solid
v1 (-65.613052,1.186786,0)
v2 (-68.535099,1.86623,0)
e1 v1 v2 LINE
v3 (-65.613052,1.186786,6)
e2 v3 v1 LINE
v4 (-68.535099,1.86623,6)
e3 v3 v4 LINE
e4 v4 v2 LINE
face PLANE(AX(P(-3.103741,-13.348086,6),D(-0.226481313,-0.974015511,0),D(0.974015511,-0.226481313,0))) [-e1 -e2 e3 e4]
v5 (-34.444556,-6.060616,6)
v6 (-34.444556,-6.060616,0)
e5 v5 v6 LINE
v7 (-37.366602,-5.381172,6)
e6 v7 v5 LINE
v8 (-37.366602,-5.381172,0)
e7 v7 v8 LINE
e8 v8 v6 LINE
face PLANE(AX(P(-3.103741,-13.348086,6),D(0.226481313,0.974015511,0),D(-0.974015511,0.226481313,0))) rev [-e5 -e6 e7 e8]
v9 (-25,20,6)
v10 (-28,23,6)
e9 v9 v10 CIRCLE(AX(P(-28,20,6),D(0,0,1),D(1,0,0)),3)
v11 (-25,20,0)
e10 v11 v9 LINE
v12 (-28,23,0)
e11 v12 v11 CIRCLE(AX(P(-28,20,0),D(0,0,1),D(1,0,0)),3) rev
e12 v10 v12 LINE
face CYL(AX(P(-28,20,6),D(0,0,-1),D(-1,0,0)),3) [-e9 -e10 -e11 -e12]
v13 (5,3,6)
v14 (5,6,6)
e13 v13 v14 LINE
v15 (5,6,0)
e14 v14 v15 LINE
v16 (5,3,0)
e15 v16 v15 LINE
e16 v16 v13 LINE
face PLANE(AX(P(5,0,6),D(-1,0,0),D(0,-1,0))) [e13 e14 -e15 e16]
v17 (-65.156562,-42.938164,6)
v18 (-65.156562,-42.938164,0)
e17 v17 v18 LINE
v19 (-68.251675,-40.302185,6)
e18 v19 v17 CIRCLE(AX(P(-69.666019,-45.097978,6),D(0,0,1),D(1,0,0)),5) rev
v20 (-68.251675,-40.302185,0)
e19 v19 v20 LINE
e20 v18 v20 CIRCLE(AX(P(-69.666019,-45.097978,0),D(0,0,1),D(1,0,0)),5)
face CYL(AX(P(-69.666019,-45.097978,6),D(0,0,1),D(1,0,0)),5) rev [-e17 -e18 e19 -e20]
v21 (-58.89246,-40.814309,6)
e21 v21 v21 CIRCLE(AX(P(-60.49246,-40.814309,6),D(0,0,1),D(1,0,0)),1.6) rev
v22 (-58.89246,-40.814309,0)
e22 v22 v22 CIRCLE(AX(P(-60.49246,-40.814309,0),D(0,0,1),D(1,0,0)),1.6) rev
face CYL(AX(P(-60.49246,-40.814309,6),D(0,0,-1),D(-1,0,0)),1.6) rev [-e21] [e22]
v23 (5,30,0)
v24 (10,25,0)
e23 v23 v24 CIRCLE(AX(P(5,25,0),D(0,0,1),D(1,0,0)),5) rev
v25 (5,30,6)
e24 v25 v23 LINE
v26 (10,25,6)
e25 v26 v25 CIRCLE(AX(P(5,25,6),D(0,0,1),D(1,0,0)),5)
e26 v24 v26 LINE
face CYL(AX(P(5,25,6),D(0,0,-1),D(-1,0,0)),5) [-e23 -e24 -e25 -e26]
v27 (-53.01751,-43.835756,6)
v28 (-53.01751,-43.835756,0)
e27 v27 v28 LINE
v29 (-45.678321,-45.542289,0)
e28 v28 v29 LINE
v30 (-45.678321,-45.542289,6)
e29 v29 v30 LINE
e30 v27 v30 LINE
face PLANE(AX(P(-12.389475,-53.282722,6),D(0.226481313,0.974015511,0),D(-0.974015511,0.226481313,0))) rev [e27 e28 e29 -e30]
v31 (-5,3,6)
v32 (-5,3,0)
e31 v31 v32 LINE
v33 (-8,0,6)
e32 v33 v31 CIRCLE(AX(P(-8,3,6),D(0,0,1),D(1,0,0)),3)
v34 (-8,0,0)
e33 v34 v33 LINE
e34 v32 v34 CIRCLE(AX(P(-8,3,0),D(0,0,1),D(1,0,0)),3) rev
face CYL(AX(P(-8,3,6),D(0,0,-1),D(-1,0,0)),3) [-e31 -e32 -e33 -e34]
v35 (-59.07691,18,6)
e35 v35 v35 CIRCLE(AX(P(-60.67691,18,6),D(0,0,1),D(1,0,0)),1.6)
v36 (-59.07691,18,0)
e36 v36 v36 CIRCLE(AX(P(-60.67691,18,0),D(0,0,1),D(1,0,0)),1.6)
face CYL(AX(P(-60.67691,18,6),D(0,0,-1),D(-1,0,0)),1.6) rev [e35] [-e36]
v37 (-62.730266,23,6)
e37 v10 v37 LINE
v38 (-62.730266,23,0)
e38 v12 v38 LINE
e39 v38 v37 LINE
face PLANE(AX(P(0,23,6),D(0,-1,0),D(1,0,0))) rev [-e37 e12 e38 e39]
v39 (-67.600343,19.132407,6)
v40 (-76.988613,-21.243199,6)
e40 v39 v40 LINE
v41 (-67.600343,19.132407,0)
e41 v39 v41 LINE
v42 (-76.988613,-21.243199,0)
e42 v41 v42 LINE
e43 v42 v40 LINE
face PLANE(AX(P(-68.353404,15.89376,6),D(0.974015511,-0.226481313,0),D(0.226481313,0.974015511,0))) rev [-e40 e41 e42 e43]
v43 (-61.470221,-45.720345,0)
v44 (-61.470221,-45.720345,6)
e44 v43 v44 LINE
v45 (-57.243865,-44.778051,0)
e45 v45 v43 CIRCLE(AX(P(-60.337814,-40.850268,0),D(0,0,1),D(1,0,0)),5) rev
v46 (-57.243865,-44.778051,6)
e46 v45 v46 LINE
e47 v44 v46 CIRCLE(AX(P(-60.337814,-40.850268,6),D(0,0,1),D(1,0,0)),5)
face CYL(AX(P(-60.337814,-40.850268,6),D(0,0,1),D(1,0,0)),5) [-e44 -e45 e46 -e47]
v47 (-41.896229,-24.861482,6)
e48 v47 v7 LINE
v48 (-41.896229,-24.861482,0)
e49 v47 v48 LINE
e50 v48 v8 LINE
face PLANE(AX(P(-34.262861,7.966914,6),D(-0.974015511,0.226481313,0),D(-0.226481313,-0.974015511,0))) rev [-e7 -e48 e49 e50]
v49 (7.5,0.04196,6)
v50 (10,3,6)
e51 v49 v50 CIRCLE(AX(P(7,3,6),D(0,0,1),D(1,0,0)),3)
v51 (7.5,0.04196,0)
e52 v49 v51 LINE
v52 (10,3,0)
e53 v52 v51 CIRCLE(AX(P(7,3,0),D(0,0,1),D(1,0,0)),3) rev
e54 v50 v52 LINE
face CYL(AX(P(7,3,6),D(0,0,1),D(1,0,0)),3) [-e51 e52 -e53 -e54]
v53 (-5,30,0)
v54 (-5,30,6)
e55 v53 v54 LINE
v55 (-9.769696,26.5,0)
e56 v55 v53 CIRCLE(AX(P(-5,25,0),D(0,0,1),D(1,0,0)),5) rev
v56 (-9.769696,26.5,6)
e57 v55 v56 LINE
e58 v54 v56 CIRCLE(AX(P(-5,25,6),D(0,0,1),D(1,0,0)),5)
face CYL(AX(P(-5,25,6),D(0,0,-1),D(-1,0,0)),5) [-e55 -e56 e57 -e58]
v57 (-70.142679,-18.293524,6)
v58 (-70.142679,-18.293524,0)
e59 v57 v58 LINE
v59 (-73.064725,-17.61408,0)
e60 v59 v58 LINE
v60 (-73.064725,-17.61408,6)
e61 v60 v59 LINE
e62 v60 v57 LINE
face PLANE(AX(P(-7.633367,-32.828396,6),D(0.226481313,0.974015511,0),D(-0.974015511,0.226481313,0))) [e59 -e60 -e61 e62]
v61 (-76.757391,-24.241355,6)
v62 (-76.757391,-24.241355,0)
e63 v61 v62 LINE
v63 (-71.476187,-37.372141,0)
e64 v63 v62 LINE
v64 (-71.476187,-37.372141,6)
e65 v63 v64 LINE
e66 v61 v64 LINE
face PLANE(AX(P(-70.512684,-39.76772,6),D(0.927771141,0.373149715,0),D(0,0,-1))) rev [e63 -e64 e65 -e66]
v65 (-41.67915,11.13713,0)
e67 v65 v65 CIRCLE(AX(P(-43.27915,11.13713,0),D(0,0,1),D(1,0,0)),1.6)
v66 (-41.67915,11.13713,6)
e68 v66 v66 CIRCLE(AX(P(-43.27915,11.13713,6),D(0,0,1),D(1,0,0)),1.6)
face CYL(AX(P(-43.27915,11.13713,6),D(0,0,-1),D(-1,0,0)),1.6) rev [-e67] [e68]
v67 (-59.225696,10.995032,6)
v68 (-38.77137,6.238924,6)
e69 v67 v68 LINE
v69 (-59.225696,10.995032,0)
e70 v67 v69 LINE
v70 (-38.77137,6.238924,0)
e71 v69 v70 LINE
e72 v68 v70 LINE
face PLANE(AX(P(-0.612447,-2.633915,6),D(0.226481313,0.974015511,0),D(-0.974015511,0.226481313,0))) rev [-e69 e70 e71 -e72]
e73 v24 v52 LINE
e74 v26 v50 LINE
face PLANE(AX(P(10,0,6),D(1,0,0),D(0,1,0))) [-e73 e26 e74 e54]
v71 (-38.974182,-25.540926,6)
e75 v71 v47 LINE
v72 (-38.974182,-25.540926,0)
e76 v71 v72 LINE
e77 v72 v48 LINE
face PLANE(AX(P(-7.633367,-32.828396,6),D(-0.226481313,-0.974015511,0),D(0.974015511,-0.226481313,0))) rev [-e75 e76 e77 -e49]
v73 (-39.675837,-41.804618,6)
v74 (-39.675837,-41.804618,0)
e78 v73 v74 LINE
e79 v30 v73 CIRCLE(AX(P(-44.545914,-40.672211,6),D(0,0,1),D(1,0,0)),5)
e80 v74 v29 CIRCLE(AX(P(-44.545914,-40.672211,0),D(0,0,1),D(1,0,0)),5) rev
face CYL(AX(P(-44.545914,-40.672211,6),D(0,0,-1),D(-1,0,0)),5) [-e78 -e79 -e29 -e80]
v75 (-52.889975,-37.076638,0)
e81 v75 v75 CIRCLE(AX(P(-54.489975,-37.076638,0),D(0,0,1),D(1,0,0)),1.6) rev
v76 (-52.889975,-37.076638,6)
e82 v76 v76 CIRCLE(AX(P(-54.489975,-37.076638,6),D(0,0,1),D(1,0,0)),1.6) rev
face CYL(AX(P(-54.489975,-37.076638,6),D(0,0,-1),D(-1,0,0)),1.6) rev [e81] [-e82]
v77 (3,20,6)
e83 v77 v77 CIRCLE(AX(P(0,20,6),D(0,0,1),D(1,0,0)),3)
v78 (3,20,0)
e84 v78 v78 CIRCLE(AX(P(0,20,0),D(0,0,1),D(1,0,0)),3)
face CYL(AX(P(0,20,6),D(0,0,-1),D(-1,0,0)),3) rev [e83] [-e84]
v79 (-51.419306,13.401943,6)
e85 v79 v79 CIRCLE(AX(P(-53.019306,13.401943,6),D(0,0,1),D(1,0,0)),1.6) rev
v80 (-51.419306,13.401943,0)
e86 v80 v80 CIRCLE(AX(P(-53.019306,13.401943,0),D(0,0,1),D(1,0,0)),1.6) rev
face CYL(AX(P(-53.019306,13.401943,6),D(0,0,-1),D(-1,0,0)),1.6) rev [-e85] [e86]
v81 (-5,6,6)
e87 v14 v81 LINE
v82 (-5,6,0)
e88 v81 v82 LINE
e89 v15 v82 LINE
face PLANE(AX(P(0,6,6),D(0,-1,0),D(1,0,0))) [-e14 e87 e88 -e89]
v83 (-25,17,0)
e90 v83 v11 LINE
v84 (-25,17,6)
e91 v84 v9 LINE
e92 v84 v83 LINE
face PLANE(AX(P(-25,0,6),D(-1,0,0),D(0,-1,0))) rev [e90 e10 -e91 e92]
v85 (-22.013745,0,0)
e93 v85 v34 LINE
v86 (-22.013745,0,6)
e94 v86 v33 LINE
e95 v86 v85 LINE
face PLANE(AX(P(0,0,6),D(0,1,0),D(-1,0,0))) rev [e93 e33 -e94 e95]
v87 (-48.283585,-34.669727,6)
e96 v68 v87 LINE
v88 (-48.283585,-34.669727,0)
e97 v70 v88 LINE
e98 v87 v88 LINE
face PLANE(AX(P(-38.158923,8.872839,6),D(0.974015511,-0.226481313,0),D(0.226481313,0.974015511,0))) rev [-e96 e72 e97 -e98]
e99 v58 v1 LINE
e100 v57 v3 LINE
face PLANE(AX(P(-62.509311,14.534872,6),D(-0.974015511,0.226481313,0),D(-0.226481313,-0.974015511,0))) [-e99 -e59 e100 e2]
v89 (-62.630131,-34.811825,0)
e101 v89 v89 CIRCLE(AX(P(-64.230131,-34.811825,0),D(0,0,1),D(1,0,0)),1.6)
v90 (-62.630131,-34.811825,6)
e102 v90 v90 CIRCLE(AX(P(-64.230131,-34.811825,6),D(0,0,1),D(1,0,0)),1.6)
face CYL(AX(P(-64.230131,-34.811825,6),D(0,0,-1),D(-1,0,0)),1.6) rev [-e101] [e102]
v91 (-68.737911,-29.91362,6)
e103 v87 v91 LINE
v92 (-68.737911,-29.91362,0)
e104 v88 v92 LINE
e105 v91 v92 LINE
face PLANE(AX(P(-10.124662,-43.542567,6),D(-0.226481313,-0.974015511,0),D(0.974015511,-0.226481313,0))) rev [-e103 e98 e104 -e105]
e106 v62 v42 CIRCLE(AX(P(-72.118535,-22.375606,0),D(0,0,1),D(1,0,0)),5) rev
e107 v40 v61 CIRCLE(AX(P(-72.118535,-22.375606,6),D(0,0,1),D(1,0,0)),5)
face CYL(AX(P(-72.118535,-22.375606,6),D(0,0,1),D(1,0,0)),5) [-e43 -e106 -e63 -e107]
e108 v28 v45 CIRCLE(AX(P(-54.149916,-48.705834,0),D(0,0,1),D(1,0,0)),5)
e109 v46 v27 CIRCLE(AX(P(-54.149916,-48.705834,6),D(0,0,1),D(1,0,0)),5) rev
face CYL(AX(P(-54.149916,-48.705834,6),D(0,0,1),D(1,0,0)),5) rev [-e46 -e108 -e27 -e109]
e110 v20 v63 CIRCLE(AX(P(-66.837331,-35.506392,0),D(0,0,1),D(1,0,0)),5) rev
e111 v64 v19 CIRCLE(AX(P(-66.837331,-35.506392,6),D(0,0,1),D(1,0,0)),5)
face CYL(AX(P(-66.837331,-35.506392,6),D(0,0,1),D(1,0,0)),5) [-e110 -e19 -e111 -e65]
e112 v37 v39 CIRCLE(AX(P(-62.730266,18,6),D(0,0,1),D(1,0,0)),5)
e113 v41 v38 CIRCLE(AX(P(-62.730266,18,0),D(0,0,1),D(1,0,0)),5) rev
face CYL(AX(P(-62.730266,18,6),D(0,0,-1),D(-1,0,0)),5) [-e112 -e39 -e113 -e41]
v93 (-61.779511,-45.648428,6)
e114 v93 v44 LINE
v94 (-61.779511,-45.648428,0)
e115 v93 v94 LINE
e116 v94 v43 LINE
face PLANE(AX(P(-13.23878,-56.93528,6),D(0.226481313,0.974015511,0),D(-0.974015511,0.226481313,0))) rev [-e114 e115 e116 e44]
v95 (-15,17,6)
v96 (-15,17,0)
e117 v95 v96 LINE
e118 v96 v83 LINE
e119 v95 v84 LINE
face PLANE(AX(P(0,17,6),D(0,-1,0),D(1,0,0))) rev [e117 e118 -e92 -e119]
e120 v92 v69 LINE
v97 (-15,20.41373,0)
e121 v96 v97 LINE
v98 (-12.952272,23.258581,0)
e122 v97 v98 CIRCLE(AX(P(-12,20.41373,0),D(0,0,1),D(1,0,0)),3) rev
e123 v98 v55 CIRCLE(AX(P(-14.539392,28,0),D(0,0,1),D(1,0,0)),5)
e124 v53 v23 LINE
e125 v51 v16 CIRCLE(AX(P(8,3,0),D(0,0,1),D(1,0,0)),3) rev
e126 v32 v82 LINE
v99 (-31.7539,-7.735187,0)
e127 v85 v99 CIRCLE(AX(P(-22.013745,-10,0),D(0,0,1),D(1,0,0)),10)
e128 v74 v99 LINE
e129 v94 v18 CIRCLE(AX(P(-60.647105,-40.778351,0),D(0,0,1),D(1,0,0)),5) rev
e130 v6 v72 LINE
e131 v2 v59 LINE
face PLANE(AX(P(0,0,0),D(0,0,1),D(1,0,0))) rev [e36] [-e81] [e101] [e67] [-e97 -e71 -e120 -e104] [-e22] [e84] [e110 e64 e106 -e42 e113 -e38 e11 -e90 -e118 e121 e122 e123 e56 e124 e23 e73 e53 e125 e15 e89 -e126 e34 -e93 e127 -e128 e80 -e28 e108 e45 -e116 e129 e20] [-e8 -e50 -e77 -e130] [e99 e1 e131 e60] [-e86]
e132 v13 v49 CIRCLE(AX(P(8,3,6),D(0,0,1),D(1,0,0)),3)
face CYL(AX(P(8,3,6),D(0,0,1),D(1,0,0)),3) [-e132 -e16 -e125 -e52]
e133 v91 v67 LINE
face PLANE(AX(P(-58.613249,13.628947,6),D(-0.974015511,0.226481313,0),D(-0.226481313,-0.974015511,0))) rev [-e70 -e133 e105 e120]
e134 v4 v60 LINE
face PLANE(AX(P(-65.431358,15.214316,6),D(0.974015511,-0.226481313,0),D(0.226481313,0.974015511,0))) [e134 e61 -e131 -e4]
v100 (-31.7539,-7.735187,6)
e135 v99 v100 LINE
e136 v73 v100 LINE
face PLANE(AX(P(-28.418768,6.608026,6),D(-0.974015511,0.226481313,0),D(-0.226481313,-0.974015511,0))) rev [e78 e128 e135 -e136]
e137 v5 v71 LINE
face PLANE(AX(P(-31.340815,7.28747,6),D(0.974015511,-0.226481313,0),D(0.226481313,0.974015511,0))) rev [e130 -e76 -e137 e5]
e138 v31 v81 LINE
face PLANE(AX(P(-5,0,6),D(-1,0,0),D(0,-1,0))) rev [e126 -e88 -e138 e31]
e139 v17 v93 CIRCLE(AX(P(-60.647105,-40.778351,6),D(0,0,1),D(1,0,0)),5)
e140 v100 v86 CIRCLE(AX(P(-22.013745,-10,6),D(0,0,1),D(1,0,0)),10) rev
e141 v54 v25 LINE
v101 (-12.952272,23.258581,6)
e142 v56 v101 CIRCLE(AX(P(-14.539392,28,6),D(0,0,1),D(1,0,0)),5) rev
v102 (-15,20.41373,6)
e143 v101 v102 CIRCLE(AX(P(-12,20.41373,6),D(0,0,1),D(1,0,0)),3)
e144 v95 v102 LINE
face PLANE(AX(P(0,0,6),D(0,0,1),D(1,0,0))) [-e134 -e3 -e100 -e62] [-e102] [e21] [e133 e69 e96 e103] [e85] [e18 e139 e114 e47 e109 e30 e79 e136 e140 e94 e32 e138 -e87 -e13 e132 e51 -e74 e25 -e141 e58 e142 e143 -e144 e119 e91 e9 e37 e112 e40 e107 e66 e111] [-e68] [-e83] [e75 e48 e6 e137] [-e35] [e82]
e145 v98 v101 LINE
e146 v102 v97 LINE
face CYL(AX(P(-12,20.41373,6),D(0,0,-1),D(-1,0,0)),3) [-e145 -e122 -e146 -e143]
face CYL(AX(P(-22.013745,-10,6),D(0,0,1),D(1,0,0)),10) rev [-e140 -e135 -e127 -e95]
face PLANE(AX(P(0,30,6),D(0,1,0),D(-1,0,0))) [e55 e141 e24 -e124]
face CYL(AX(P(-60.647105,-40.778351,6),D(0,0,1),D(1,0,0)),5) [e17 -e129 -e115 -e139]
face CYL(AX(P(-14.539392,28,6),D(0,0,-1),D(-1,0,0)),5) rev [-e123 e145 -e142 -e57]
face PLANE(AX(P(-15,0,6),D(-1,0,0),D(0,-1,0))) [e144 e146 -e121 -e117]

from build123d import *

# Parameters (mm, degrees)
ESBO_O1_R                = 1.599999999999999
ESBO_O1_R_2              = 1.600000000000006
ESBO_O1_R_3              = 1.5999999999999974
ESBO_O1_R_4              = 1.5999999999999985
ESBO_O1_R_5              = 1.5999999999999979
ESBO_O1_R_6              = 1.600000000000005
ESBO_O1_R_7              = 3.0000000000000013
RESSALTO_EXTRUS_O1_DEPTH = 6
FILETE1_R                = 10
FILETE2_R                = 5
FILETE4_R                = 5
FILETE5_R                = 3
CHANFRO1_SIZE            = 15
CHANFRO1_SIZE2           = 10.50311307314568
FILETE6_R                = 5


# Some blends are built 0.0001 mm under size
with BuildPart() as part:
    # Esboço1 → Ressalto-extrusão1 (new body)
    with BuildSketch(Plane.XY):
        Polygon((10.000000000000002, -2e-17), (9.999999999999998, 30.00000000000003), (-10.000000000000002, 30.000000000000025), (-10.000000000000002, 23.000000000000007), (-15.00000000000002, 22.99999999999999), (-15, 16.999999999999996), (-25, 17), (-25.000000000000007, 22.999999999999993), (-66.7010377283415, 23.00000000000001), (-80.7428791412217, -37.388961654722294), (-65.64563872754113, -40.899422007942356), (-66.49494365170727, -44.55198017254248), (-56.754788546106894, -46.81679330365219), (-55.90548362194075, -43.16423513905207), (-40.8082432082602, -46.674695492272136), (-29.95528839436153, 0), (-5.0000000000000036, -3e-17), (-5.000000000000001, 5.999999999999998), (4.999999999999999, 6), (5, -9.54e-15), align=None)
        with Locations((-60.49245953335221, -40.814309185297155)):
            Circle(ESBO_O1_R, mode=Mode.SUBTRACT)
        with Locations((-64.23013052059758, -34.81182506694214)):
            Circle(ESBO_O1_R_2, mode=Mode.SUBTRACT)
        with Locations((-54.48997541499719, -37.07663819805185)):
            Circle(ESBO_O1_R_3, mode=Mode.SUBTRACT)
        Polygon((-70.14267850253108, -18.293523811627352), (-73.06472503421121, -17.614079872294436), (-68.53509877199178, 1.8662303389063057), (-65.61305224031166, 1.1867863995733938), align=None, mode=Mode.SUBTRACT)
        Polygon((-48.28358518275084, -34.66972725556205), (-68.73791090451164, -29.91361968023165), (-59.22569575385083, 10.995031763289926), (-38.771370032090054, 6.238924187959523), align=None, mode=Mode.SUBTRACT)
        Polygon((-34.44455590239049, -6.060615619977673), (-38.97418216460991, -25.540925831178406), (-41.89622869629001, -24.861481891845497), (-37.3666024340706, -5.3811716806447585), align=None, mode=Mode.SUBTRACT)
        with Locations((-60.67691042150691, 18.000000000000004)):
            Circle(ESBO_O1_R_4, mode=Mode.SUBTRACT)
        with Locations((-53.019305521604494, 13.40194270577972)):
            Circle(ESBO_O1_R_5, mode=Mode.SUBTRACT)
        with Locations((-43.2791504160041, 11.137129574670004)):
            Circle(ESBO_O1_R_6, mode=Mode.SUBTRACT)
        with Locations((-2.44e-15, 20)):
            Circle(ESBO_O1_R_7, mode=Mode.SUBTRACT)
    extrude(amount=RESSALTO_EXTRUS_O1_DEPTH)

    # Filete1
    filete1_edges = [part.edges().sort_by_distance(p)[0] for p in [
        (-29.95528839436153, -3e-17, 3),
    ]]
    fillet(filete1_edges, radius=FILETE1_R)

    # Filete2
    # the kernel refuses this fillet: 5 mm, written as the material it takes off along each edge
    with BuildSketch(Plane(origin=(-66.70103772834149, 23.00000000000001, -9.926929788370014), x_dir=(-0.22648131311097233, -0.974015510560037, 0), z_dir=(0, 0, 1))) as filete2_piece_1:
        with BuildLine():
            CenterArc((FILETE2_R * 0.79415438307, FILETE2_R), FILETE2_R, 193.08999999999958, 76.91000000000048)
            Line((-FILETE2_R * 0.17986112749, FILETE2_R * 0.773518686889), (-FILETE2_R * 0.199341437702, FILETE2_R * 0.768989060627))
            Line((-FILETE2_R * 0.199341437702, FILETE2_R * 0.768989060627), (-FILETE2_R * 0.0158830876614, -FILETE2_R * 0.02))
            Line((-FILETE2_R * 0.0158830876614, -FILETE2_R * 0.02), (FILETE2_R * 0.79415438307, -FILETE2_R * 0.02))
            Line((FILETE2_R * 0.79415438307, -FILETE2_R * 0.02), (FILETE2_R * 0.79415438307, 6e-17))
        make_face()
    extrude(amount=25.853859576740028, mode=Mode.SUBTRACT)
    with BuildSketch(Plane(origin=(-66.49494365170727, -44.55198017254248, -12.103072956898195), x_dir=(0.9740155105600374, -0.22648131311097125, 0), z_dir=(0, 0, 1))) as filete2_piece_2:
        with BuildLine():
            CenterArc((4.841229182759275, 5.000000000000003), FILETE2_R, 194.4775121859302, 75.52248781406985)
            Line((1.133e-14, 3.7499999999999782), (-0.09682458365516827, 3.7249999999999814))
            ThreePointArc((-0.09682458365516827, 3.7249999999999814), (-0.10000000000000146, 1.874999999999995), (-0.10000000000000632, 2.39e-15))
            Line((-0.10000000000000632, 2.39e-15), (-4e-15, -0.0999999999999994))
            Line((-4e-15, -0.0999999999999994), (4.841229182759282, -0.09999999999999787))
            Line((4.841229182759282, -0.09999999999999787), (4.841229182759279, -9e-17))
        make_face()
    extrude(amount=30.20614591379639, mode=Mode.SUBTRACT)
    with BuildSketch(Plane(origin=(-56.754788546106894, -46.81679330365219, -12.103072956898142), x_dir=(0.22648131311097194, 0.9740155105600371, 0), z_dir=(0, 0, 1))) as filete2_piece_3:
        with BuildLine():
            CenterArc((4.9999999999999964, 4.841229182759264), FILETE2_R, 180.00000000000009, 75.52248781406979)
            Line((-5.64e-15, 4.841229182759256), (-0.10000000000000338, 4.841229182759253))
            Line((-0.10000000000000338, 4.841229182759253), (-0.09999999999999777, -2.99e-15))
            Line((-0.09999999999999777, -2.99e-15), (2.99e-15, -0.09999999999999777))
            ThreePointArc((2.99e-15, -0.09999999999999777), (1.8749999999999951, -0.10000000000000121), (3.724999999999985, -0.09682458365518365))
            Line((3.724999999999985, -0.09682458365518365), (3.7499999999999827, 3e-17))
        make_face()
    extrude(amount=30.206145913796284, mode=Mode.SUBTRACT)
    with BuildSketch(Plane(origin=(-40.8082432082602, -46.674695492272136, -12.500000000000021), x_dir=(0.22648131311097006, 0.9740155105600377, 0), z_dir=(0, 0, 1))) as filete2_piece_4:
        with BuildLine():
            CenterArc((FILETE2_R, FILETE2_R), FILETE2_R, 179.9999999999999, 90)
            Line((2.239e-14, FILETE2_R), (-FILETE2_R * 0.02, FILETE2_R))
            Line((-FILETE2_R * 0.02, FILETE2_R), (-FILETE2_R * 0.02, -FILETE2_R * 0.02))
            Line((-FILETE2_R * 0.02, -FILETE2_R * 0.02), (FILETE2_R, -FILETE2_R * 0.02))
            Line((FILETE2_R, -FILETE2_R * 0.02), (FILETE2_R, 6e-17))
        make_face()
    extrude(amount=31.000000000000043, mode=Mode.SUBTRACT)
    with BuildSketch(Plane(origin=(-10.000000000000002, 30.000000000000025, -12.499999999999996), x_dir=(1, 0, 0), z_dir=(0, 0, 1))) as filete2_piece_5:
        with BuildLine():
            CenterArc((FILETE2_R, -FILETE2_R), FILETE2_R, 90.00000000000001, 89.99999999999996)
            Line((-1.78e-15, -FILETE2_R), (-FILETE2_R * 0.02, -FILETE2_R))
            Line((-FILETE2_R * 0.02, -FILETE2_R), (-FILETE2_R * 0.02, FILETE2_R * 0.02))
            Line((-FILETE2_R * 0.02, FILETE2_R * 0.02), (FILETE2_R, FILETE2_R * 0.02))
            Line((FILETE2_R, FILETE2_R * 0.02), (FILETE2_R, 0))
        make_face()
    extrude(amount=30.999999999999993, mode=Mode.SUBTRACT)
    with BuildSketch(Plane(origin=(9.999999999999998, 30.00000000000003, -12.5), x_dir=(0, -1, 0), z_dir=(0, 0, 1))) as filete2_piece_6:
        with BuildLine():
            CenterArc((FILETE2_R, -FILETE2_R), FILETE2_R, 90, 90)
            Line((0, -FILETE2_R), (-FILETE2_R * 0.02, -FILETE2_R))
            Line((-FILETE2_R * 0.02, -FILETE2_R), (-FILETE2_R * 0.02, FILETE2_R * 0.02))
            Line((-FILETE2_R * 0.02, FILETE2_R * 0.02), (FILETE2_R, FILETE2_R * 0.02))
            Line((FILETE2_R, FILETE2_R * 0.02), (FILETE2_R, 0))
        make_face()
    extrude(amount=31, mode=Mode.SUBTRACT)

    # Filete4
    filete4_edges = [part.edges().sort_by_distance(p)[0] for p in [
        (-65.64563872754113, -40.89942200794236, 3),
        (-55.90548362194075, -43.16423513905207, 3),
        (-10.000000000000002, 23, 3),
    ]]
    fillet(filete4_edges, radius=FILETE4_R - 0.0001)  # a hair under: the kernel refuses the full size

    # Filete5
    # the kernel refuses this fillet: 3 mm, written as the material it takes off along each edge
    with BuildSketch(Plane(origin=(-25.000000000000007, 23.000000000000007, -7.499999999999991), x_dir=(-1, 0, 0), z_dir=(0, 0, 1))) as filete5_piece_1:
        with BuildLine():
            CenterArc((FILETE5_R, FILETE5_R), FILETE5_R, 180.00000000000006, 89.99999999999994)
            Line((-3.55e-15, FILETE5_R), (0, 0))
            Line((0, 0), (FILETE5_R, 0))
        make_face()
    extrude(amount=20.99999999999998, mode=Mode.SUBTRACT)
    with BuildSketch(Plane(origin=(-15.00000000000002, 22.99999999999999, -6.465722061975505), x_dir=(3.43e-15, -1, 0), z_dir=(0, 0, 1))) as filete5_piece_2:
        with BuildLine():
            CenterArc((2.5862888247905, 3), FILETE5_R, 198.50689627931516, 71.49310372068487)
            Line((-0.25856754520870956, 2.0477436090658623), (-0.5430531822086313, 1.9525179699724493))
            ThreePointArc((-0.5430531822086313, 1.9525179699724493), (-0.2999999999996936, 0.4606813660513637), (-0.3000000000000007, 1.03e-15))
            Line((-0.3000000000000007, 1.03e-15), (-1.03e-15, -0.3000000000000007))
            Line((-1.03e-15, -0.3000000000000007), (2.5862888247904996, -0.3000000000000007))
            Line((2.5862888247904996, -0.3000000000000007), (2.5862888247905005, 0))
        make_face()
    extrude(amount=18.93144412395101, mode=Mode.SUBTRACT)
    with BuildSketch(Plane(origin=(-5.0000000000000036, -3e-17, -7.5), x_dir=(-1, 1e-17, 0), z_dir=(0, 0, 1))) as filete5_piece_3:
        with BuildLine():
            CenterArc((FILETE5_R, -FILETE5_R), FILETE5_R, 90, 90)
            Line((3e-17, -FILETE5_R), (0, 0))
            Line((0, 0), (FILETE5_R, 0))
        make_face()
    extrude(amount=21, mode=Mode.SUBTRACT)
    with BuildSketch(Plane(origin=(10.000000000000002, -2e-17, -7.500000000000002), x_dir=(-1, 1e-17, 0), z_dir=(0, 0, 1))) as filete5_piece_4:
        with BuildLine():
            CenterArc((FILETE5_R, -FILETE5_R), FILETE5_R, 90, 90)
            Line((1.79e-15, -FILETE5_R), (0, 0))
            Line((0, 0), (FILETE5_R, 0))
        make_face()
    extrude(amount=21, mode=Mode.SUBTRACT)
    with BuildSketch(Plane(origin=(5, 0, -7.5), x_dir=(-3e-16, 1, 0), z_dir=(0, 0, 1))) as filete5_piece_5:
        with BuildLine():
            CenterArc((FILETE5_R, -FILETE5_R), FILETE5_R, 90, 90)
            Line((-8.9e-16, -FILETE5_R), (0, 0))
            Line((0, 0), (FILETE5_R, 0))
        make_face()
    extrude(amount=21, mode=Mode.SUBTRACT)

    # Chanfro1
    chanfro1_edges = [part.edges().sort_by_distance(p)[0] for p in [
        (-80.7428791412217, -37.388961654722294, 3),
    ]]
    chanfro1_side = [part.faces().sort_by_distance(p)[0] for p in [
        (-74.1716112535079, -9.128277544584641, 3),
    ]]
    chamfer(chanfro1_edges, length=CHANFRO1_SIZE, length2=CHANFRO1_SIZE2, reference=chanfro1_side[0])

    # Filete6
    filete6_edges = [part.edges().sort_by_distance(p)[0] for p in [
        (-77.34565944455714, -22.778728996321732, 3),
        (-70.51268409881192, -39.76772049528134, 3),
    ]]
    fillet(filete6_edges, radius=FILETE6_R)


solid = part.part
